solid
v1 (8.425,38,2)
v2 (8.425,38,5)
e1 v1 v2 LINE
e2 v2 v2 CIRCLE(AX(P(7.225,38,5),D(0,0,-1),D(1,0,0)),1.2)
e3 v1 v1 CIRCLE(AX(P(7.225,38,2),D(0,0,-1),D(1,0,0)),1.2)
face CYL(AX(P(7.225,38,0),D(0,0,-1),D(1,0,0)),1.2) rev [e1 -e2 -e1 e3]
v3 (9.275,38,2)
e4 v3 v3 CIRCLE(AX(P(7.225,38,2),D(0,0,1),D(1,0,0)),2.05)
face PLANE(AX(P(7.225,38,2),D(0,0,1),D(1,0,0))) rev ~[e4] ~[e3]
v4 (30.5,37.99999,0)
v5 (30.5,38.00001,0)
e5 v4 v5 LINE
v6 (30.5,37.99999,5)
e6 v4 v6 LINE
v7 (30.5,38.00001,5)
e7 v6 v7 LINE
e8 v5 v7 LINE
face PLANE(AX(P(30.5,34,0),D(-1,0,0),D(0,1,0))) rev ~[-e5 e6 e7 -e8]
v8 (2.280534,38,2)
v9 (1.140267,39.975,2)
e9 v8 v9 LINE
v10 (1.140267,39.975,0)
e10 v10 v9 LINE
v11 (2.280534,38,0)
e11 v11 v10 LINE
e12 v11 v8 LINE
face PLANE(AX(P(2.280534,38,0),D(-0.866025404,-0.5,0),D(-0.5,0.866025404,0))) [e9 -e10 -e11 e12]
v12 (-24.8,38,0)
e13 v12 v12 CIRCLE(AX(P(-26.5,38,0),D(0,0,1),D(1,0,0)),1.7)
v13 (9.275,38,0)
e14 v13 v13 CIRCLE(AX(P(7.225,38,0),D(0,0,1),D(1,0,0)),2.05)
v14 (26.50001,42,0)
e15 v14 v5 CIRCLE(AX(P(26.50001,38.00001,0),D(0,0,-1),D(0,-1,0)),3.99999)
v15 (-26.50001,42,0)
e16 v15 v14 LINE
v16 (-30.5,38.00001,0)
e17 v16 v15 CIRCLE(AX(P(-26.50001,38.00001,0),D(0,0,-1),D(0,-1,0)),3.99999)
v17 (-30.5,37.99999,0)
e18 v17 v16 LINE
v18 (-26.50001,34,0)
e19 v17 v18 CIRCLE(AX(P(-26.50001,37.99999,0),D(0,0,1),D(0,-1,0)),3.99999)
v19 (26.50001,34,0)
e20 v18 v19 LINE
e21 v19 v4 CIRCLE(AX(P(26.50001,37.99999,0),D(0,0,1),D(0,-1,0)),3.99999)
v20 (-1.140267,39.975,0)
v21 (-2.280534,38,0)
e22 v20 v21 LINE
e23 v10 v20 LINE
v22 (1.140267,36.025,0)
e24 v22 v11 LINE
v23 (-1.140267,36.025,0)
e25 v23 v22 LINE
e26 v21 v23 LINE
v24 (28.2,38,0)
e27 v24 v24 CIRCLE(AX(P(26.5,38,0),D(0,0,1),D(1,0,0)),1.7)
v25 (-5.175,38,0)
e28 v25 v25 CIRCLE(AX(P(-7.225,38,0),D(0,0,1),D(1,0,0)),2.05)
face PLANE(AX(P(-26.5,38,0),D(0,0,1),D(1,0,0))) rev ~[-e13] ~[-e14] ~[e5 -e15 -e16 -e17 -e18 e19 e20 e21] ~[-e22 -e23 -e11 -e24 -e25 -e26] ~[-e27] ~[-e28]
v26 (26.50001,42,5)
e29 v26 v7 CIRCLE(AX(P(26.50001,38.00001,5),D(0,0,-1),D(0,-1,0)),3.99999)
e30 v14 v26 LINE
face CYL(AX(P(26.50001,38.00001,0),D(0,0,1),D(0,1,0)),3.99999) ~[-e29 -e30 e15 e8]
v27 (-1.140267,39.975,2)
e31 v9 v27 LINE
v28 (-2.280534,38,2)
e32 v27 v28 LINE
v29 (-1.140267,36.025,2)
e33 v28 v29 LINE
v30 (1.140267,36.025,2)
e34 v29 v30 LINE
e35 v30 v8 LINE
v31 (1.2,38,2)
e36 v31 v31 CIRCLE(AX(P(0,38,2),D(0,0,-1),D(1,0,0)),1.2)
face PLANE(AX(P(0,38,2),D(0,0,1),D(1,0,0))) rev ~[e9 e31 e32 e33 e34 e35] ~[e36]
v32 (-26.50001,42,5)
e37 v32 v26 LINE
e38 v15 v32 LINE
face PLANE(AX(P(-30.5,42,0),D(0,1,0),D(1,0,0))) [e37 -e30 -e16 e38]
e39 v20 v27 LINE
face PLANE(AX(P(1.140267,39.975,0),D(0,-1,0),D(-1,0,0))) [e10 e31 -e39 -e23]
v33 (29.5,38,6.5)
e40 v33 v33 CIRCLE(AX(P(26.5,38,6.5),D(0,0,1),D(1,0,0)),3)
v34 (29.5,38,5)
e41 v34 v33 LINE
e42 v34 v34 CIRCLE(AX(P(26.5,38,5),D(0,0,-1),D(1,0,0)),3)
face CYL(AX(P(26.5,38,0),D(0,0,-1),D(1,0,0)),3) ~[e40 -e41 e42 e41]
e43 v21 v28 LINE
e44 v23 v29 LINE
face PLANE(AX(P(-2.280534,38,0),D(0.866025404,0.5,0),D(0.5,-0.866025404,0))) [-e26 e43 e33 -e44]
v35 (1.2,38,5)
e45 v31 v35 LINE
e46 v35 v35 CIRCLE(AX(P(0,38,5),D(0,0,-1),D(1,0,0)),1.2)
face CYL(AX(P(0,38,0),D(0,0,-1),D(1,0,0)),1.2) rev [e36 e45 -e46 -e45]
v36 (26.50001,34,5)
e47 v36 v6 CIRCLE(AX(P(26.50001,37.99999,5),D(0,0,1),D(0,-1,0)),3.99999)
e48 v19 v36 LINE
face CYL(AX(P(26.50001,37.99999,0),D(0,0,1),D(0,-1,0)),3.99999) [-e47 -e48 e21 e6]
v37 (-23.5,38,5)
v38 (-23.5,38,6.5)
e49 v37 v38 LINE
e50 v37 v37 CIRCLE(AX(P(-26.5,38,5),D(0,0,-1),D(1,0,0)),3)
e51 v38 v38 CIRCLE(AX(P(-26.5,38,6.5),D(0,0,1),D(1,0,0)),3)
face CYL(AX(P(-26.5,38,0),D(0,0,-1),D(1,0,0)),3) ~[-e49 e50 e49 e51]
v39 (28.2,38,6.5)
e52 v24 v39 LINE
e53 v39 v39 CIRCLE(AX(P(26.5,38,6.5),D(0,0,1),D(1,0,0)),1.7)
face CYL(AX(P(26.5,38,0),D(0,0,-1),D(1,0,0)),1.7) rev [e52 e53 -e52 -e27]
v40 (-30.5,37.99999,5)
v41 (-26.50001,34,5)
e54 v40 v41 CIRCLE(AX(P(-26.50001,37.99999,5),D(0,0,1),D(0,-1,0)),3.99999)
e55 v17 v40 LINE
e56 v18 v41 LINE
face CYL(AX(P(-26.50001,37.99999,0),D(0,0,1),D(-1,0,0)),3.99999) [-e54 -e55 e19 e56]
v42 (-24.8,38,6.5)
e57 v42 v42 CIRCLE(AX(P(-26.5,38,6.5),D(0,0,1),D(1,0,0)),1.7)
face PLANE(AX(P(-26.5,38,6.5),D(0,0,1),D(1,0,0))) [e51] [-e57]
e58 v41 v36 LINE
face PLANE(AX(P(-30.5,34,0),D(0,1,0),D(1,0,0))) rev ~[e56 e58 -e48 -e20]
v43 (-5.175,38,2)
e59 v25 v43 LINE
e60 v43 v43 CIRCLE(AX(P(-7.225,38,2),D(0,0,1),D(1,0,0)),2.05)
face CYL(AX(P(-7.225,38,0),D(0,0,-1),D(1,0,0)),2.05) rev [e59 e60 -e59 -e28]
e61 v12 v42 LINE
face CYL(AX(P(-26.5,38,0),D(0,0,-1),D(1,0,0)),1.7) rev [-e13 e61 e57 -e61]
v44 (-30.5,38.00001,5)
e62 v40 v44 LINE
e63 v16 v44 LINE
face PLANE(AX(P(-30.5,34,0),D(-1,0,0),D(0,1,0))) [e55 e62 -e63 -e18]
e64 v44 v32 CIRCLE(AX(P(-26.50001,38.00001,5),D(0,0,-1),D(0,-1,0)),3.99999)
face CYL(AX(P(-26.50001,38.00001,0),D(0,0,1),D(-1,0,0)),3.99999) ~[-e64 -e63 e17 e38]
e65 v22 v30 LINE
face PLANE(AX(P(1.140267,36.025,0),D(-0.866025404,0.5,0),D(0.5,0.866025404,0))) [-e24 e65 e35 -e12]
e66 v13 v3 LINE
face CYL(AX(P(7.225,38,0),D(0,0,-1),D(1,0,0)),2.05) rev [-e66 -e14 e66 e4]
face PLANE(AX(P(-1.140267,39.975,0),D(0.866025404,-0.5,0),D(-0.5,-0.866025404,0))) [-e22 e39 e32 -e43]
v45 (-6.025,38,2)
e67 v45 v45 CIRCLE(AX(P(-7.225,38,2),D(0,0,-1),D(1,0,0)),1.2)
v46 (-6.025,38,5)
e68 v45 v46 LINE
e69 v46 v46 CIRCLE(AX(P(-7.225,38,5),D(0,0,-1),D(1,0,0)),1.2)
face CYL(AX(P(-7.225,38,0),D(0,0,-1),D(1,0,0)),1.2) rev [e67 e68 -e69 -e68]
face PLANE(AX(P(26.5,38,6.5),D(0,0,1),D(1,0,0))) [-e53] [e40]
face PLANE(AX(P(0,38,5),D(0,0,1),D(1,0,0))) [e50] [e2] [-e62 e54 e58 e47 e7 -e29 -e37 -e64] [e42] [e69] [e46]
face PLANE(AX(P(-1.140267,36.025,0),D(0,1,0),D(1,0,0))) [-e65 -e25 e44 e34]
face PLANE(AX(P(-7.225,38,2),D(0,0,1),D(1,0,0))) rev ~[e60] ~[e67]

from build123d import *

# Parameters (mm, degrees)
F2_W      = 61
F2_H      = 8
F2_R      = 3
F5_DEPTH  = 5
F1_R      = 3
F1_R_2    = 1.7
F6_DEPTH  = 6.5
F0_R      = 1.7
F7_DEPTH  = 12.5
F3_R      = 2.05
F8_DEPTH  = 2
F9_DEPTH  = 2
F10_R     = 3.99999
F4_R      = 1.2
F11_DEPTH = 6.501


# Not quite as in the source:
# - a fillet or chamfer is up to 0.001 mm smaller than in the source, because OpenCascade refuses the exact size


with BuildPart() as f5:
    # F2 (on face) → F5 (new body)
    with BuildSketch(Plane.XY):
        with Locations((0, 38)):
            Rectangle(F2_W, F2_H)
        with Locations((-26.5, 38)):
            Circle(F2_R, mode=Mode.SUBTRACT)
        Polygon((1.1402667816, 36.025), (0, 36.025), (-1.1402667816, 36.025), (-2.2805335633, 38), (-1.1402667816, 39.975), (0, 39.975), (1.1402667816, 39.975), (2.2805335633, 38), align=None, mode=Mode.SUBTRACT)
        with Locations((26.5, 38)):
            Circle(F2_R, mode=Mode.SUBTRACT)
        Polygon((-1.1402667816, 36.025), (0, 36.025), (1.1402667816, 36.025), (2.2805335633, 38), (1.1402667816, 39.975), (0, 39.975), (-1.1402667816, 39.975), (-2.2805335633, 38), align=None)
        with Locations((-26.5, 38)):
            Circle(F2_R)
        with Locations((26.5, 38)):
            Circle(F2_R)
    extrude(amount=F5_DEPTH)

    # F1 (on Top) → F6 (join)
    with BuildSketch(Plane.XY):
        with Locations((-26.5, 38)):
            Circle(F1_R)
        with Locations((-26.5, 38)):
            Circle(F1_R_2, mode=Mode.SUBTRACT)
        with Locations((26.5, 38)):
            Circle(F1_R)
        with Locations((26.5, 38)):
            Circle(F1_R_2, mode=Mode.SUBTRACT)
    extrude(amount=F6_DEPTH)

    # F0 (on Top) → F7 (cut, symmetric)
    with BuildSketch(Plane.XY):
        with Locations((-26.5, 38)):
            Circle(F0_R)
        with Locations((26.5, 38)):
            Circle(F0_R)
        with Locations((-26.5, -38)):
            Circle(F0_R)
        with Locations((26.5, -38)):
            Circle(F0_R)
    extrude(amount=F7_DEPTH, both=True, mode=Mode.SUBTRACT)

    # F3 (on face) → F8 (cut)
    with BuildSketch(Plane.XY):
        with Locations((-7.225, 38)):
            Circle(F3_R)
        with Locations((7.225, 38)):
            Circle(F3_R)
    extrude(amount=F8_DEPTH, mode=Mode.SUBTRACT)

    # F2 (on face) → F9 (cut)
    with BuildSketch(Plane.XY):
        Polygon((-1.1402667816, 36.025), (0, 36.025), (1.1402667816, 36.025), (2.2805335633, 38), (1.1402667816, 39.975), (0, 39.975), (-1.1402667816, 39.975), (-2.2805335633, 38), align=None)
    extrude(amount=F9_DEPTH, mode=Mode.SUBTRACT)

    # F10 (radius 4 in the source; OpenCascade refuses exactly that, so slightly less here)
    f10_edges = [f5.edges().sort_by_distance(p)[0] for p in [
        (-30.5, 42, 2.5),
        (-30.5, 34, 2.5),
        (30.5, 42, 2.5),
        (30.5, 34, 2.5),
    ]]
    fillet(f10_edges, radius=F10_R)

    # F4 (on face) → F11 (cut, through all)
    with BuildSketch(Plane.XY):
        with Locations((-7.225, 38)):
            Circle(F4_R)
        with Locations((0, 38)):
            Circle(F4_R)
        with Locations((7.225, 38)):
            Circle(F4_R)
    extrude(amount=F11_DEPTH, mode=Mode.SUBTRACT)


solid = f5.part
